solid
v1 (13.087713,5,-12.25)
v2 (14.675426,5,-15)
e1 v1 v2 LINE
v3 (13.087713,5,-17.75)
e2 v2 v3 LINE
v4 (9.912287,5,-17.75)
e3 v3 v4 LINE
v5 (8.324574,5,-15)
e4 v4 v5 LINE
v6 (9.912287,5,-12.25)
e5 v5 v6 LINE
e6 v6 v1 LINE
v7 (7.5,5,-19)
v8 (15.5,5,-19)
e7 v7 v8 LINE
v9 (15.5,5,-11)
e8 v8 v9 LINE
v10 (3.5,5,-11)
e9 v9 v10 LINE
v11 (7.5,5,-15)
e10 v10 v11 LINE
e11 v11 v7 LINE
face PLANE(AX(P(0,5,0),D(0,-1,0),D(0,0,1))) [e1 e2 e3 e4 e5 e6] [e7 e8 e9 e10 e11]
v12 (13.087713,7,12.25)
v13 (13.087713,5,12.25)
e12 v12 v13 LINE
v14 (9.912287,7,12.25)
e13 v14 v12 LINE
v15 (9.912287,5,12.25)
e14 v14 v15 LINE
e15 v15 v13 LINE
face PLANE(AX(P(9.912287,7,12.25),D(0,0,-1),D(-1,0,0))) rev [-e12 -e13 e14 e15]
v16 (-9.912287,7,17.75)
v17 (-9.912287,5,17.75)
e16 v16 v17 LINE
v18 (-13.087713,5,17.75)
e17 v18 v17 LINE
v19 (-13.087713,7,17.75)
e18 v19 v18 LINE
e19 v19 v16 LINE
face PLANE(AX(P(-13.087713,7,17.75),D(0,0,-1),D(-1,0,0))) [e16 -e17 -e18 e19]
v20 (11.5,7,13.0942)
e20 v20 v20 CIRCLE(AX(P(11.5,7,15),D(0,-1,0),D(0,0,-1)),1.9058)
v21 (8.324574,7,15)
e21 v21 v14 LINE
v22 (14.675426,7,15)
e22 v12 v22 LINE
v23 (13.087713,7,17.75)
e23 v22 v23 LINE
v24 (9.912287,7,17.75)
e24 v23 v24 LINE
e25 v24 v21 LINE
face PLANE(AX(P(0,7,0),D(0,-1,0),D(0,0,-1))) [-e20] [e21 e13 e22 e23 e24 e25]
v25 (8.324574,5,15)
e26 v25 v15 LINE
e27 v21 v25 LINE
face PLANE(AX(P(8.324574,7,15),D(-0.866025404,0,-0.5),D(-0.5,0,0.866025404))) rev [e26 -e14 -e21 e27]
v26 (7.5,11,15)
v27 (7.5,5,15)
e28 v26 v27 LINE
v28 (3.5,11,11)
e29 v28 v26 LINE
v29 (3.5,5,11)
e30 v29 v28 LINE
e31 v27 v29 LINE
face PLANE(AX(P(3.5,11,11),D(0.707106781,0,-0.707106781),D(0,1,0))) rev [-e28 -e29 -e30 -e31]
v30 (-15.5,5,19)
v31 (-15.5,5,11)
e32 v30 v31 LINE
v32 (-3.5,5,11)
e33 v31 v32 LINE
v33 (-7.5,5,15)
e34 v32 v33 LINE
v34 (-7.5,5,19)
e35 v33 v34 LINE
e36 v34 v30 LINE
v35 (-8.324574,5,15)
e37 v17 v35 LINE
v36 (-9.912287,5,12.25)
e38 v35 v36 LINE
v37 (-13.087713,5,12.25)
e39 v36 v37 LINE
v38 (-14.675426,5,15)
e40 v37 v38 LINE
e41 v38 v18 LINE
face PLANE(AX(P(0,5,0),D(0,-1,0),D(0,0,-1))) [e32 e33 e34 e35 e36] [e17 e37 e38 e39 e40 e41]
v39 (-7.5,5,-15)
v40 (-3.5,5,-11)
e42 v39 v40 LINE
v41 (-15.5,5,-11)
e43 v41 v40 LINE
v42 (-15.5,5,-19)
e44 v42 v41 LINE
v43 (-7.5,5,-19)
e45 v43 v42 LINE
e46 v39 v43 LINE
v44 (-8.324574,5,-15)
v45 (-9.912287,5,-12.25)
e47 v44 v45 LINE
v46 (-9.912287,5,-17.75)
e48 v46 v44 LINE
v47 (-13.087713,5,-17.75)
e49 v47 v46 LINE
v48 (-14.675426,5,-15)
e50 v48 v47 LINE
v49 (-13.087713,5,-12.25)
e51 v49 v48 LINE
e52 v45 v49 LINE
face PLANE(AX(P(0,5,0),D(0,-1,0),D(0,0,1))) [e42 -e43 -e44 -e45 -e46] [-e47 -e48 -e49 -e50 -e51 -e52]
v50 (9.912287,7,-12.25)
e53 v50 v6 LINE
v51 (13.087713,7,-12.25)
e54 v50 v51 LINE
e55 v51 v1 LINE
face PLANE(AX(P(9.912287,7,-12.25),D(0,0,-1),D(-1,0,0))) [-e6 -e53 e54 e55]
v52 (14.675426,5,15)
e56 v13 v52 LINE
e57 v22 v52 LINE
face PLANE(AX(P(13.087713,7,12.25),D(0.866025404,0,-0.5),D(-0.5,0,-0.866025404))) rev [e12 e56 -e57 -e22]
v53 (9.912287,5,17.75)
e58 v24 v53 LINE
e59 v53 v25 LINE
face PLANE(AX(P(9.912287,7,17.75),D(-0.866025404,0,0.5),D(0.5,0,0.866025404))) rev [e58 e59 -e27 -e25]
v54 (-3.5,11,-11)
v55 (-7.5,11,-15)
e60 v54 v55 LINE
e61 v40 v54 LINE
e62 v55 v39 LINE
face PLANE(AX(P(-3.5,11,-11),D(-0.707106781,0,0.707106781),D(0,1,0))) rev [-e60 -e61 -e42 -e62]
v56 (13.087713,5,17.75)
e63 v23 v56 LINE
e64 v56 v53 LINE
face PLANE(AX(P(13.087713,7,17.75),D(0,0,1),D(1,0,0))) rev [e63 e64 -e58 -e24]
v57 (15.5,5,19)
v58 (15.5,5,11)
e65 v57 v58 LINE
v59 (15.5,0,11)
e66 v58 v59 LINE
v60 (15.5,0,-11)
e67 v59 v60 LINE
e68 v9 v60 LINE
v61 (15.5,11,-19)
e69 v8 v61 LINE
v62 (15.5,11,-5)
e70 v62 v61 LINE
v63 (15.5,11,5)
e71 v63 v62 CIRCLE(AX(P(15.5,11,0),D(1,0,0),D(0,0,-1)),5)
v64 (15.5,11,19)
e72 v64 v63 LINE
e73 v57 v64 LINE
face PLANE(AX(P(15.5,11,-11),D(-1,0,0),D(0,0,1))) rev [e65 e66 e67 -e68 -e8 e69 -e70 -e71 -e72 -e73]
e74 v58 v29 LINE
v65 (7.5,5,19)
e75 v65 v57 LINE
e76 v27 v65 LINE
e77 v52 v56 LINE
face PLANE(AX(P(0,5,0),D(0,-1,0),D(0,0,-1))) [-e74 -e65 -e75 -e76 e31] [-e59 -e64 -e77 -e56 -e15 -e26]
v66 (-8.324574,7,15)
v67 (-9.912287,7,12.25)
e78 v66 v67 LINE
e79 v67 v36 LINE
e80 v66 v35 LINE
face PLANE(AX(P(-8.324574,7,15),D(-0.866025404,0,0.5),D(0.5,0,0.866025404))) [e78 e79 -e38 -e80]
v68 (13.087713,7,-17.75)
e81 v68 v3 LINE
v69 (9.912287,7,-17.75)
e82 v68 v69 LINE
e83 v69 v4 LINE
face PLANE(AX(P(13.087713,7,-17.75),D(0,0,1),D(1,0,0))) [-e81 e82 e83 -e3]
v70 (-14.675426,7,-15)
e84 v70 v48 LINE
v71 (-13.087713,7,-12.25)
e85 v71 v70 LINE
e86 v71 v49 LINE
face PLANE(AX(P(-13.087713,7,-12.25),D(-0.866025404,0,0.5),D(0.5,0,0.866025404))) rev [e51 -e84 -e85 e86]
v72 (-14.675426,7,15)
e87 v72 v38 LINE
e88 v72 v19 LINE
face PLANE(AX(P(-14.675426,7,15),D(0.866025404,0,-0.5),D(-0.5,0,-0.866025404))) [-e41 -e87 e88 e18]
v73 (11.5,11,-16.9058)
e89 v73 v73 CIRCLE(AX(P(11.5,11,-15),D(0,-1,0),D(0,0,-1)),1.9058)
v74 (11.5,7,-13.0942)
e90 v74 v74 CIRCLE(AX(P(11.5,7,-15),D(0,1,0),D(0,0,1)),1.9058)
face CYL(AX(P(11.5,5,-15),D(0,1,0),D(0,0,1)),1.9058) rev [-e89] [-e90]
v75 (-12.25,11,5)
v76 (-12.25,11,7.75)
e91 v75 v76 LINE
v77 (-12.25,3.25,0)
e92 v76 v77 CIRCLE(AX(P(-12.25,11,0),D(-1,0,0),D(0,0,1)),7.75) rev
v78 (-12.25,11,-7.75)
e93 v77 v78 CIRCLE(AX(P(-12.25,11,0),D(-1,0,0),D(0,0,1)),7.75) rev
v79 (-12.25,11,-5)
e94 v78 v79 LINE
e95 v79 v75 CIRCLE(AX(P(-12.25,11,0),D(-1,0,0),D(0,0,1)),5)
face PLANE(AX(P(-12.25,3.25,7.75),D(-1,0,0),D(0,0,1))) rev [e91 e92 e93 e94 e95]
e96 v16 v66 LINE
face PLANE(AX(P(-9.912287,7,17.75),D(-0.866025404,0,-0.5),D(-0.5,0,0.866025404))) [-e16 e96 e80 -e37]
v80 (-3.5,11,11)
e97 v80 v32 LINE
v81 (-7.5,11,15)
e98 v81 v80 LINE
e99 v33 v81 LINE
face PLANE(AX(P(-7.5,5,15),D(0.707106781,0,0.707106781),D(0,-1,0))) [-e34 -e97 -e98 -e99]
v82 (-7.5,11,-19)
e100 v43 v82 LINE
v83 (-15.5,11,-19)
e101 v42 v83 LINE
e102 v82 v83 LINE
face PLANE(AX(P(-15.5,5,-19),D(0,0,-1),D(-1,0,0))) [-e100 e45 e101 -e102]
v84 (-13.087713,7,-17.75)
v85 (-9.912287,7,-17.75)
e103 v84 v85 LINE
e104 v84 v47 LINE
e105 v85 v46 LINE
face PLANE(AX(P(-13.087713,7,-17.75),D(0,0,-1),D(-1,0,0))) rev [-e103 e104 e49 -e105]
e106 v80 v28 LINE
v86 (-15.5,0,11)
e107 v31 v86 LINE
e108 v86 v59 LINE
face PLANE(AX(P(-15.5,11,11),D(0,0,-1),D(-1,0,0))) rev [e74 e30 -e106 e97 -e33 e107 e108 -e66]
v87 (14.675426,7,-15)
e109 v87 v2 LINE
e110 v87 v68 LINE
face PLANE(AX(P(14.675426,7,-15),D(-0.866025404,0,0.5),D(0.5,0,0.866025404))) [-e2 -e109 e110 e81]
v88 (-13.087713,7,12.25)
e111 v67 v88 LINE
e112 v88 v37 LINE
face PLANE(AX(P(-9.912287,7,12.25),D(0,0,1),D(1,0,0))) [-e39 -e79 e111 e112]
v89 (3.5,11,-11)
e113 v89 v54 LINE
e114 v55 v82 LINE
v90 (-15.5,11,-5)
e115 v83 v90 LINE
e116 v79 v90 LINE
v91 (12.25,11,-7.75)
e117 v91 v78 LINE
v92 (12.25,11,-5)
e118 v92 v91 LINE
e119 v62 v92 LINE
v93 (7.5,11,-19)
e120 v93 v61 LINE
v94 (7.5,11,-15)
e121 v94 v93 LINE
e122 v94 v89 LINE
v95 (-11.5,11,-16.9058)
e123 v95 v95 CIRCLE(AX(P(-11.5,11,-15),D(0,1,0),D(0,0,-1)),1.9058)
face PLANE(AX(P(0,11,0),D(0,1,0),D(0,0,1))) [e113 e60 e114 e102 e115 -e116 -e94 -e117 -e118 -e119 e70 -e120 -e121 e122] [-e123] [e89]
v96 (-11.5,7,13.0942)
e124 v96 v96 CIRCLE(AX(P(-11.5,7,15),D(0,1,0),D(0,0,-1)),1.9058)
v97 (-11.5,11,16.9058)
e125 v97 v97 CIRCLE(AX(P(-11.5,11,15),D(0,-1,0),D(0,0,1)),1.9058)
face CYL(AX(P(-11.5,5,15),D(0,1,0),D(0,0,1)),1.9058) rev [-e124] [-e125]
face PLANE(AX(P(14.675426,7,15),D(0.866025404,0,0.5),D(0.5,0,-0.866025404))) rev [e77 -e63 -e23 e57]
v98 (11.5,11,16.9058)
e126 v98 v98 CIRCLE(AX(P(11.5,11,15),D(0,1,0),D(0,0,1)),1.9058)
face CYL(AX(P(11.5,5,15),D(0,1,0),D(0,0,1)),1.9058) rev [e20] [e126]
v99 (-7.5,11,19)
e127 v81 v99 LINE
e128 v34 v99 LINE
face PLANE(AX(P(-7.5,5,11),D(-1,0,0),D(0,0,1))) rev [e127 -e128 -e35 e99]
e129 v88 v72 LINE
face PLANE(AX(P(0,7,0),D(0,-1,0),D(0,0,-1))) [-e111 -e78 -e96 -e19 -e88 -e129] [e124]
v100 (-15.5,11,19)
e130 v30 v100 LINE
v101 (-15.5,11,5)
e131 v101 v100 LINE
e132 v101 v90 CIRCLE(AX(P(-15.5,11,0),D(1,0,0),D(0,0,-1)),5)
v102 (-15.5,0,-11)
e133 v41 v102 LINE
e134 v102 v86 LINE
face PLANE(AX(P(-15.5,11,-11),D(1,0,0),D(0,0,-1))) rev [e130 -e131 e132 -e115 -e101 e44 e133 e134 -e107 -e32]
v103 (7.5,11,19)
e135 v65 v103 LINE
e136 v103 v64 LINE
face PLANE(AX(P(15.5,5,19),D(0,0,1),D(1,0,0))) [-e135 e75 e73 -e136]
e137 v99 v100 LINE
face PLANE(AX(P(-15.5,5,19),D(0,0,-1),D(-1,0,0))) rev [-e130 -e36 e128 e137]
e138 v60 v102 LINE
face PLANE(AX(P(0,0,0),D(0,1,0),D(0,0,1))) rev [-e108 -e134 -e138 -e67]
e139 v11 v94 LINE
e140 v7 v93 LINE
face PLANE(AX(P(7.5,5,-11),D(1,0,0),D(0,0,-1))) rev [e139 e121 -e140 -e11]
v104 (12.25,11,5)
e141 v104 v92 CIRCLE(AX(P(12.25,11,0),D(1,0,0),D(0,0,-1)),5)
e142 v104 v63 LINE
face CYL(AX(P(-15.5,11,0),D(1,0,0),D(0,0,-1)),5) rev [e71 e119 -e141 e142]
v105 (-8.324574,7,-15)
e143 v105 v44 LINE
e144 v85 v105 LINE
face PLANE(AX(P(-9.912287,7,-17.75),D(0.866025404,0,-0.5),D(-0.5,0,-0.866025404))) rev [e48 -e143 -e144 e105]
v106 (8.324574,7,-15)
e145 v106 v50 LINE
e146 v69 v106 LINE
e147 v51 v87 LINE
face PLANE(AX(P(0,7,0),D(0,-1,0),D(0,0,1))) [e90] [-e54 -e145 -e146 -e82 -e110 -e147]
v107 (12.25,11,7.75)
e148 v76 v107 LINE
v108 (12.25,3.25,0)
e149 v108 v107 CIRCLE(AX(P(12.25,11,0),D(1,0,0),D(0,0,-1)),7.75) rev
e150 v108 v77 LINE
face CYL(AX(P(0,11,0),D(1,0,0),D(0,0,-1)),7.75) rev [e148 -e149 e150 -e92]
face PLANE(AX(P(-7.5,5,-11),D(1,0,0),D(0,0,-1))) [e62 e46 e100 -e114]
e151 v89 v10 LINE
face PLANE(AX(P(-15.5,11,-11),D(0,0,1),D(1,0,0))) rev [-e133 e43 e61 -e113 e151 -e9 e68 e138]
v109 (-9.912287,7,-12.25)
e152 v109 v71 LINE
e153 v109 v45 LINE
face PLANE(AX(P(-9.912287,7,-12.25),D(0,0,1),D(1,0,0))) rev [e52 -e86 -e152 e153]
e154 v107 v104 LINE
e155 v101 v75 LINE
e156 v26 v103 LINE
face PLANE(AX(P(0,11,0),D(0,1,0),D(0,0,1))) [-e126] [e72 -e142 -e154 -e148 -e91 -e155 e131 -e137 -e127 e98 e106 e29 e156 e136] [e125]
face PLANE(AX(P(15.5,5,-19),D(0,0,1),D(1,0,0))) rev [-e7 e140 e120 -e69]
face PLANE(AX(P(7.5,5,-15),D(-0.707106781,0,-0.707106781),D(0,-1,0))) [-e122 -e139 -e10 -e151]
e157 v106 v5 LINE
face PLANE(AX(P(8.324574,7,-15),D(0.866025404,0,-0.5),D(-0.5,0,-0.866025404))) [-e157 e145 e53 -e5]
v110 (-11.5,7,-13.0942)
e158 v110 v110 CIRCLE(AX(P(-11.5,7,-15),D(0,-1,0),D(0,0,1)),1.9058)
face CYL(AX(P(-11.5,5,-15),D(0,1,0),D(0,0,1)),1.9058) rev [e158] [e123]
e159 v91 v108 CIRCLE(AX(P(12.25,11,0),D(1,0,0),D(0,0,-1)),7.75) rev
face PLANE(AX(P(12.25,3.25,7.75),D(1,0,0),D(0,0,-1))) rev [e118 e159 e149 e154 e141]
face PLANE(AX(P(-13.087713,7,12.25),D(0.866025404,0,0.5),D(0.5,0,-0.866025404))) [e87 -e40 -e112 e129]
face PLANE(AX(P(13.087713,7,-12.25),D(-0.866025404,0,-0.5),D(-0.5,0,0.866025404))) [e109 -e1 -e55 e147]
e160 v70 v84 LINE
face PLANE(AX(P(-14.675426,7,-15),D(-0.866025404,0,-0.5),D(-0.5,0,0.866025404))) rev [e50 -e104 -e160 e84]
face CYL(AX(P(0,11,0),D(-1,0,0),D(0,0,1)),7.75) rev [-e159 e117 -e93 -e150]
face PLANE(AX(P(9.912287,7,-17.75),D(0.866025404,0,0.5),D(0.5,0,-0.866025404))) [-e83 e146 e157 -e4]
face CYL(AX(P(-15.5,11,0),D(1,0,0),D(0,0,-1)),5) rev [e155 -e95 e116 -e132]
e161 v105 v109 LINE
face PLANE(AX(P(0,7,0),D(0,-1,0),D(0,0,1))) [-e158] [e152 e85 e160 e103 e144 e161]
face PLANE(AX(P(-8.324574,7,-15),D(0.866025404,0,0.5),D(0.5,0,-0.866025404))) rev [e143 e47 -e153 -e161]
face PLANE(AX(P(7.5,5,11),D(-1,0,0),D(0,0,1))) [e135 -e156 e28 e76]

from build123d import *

# Parameters (mm, degrees)
SKETCH1_W                = 31
SKETCH1_H                = 22
BOSS_EXTRUDE1_DEPTH      = 11
SKETCH3_W                = 24.5
SKETCH3_H                = 15.5
CUT_EXTRUDE1_DEPTH       = 7.75
FILLET1_R                = 7.75
CUT_EXTRUDE2_DEPTH       = 32.812929761
CUT_EXTRUDE2_DEPTH_BACK  = 32.812929761
SKETCH4_R                = 5
SKETCH5_W                = 8
SKETCH5_H                = 8
SKETCH5_R                = 1.905800151
BOSS_EXTRUDE3_DEPTH      = 6
MIRROR9_COPY_1_SKETCH_W  = 8
MIRROR9_COPY_1_SKETCH_H  = 8
MIRROR9_COPY_1_SKETCH_R  = 1.905800151
MIRROR9_COPY_1_DEPTH     = 6
CUT_EXTRUDE4_START       = -2
SKETCH7_R                = 1.905800151
CUT_EXTRUDE4_DEPTH       = 2
MIRROR11_START           = -2
MIRROR11_COPY_1_SKETCH_R = 1.905800151
MIRROR11_COPY_1_DEPTH    = 2
CHAMFER3_SIZE            = 4


with BuildPart() as part:
    # Sketch1 → Boss-Extrude1 (new body)
    with BuildSketch(Plane(origin=(0, 0, 0), x_dir=(1, 0, 0), z_dir=(0, 1, 0))):
        Rectangle(SKETCH1_W, SKETCH1_H)
    extrude(amount=BOSS_EXTRUDE1_DEPTH)

    # Sketch3 → Cut-Extrude1 (cut)
    with BuildSketch(Plane(origin=(0, 11, 0), x_dir=(1, 0, 0), z_dir=(0, 1, 0))):
        Rectangle(SKETCH3_W, SKETCH3_H)
    extrude(amount=-CUT_EXTRUDE1_DEPTH, mode=Mode.SUBTRACT)

    # Fillet1
    fillet1_edges = [part.edges().sort_by_distance(p)[0] for p in [
        (0, 3.25, 7.75),
        (0, 3.25, -7.75),
    ]]
    fillet(fillet1_edges, radius=FILLET1_R - 0.0001)  # a hair under: the kernel refuses the full size

    # Sketch4 → Cut-Extrude2 (cut, two sides: drawn at the far end of the back side and taken through both)
    with BuildSketch(Plane(origin=(-12.25, 0, 0), x_dir=(0, 0, -1), z_dir=(1, 0, 0)).offset(-CUT_EXTRUDE2_DEPTH_BACK)):
        with Locations((0, 11)):
            Circle(SKETCH4_R)
    extrude(amount=CUT_EXTRUDE2_DEPTH + CUT_EXTRUDE2_DEPTH_BACK, mode=Mode.SUBTRACT)

    # Sketch5 → Boss-Extrude3 (add)
    with BuildSketch(Plane(origin=(0, 11, 0), x_dir=(1, 0, 0), z_dir=(0, 1, 0))):
        with Locations((11.5, -15)):
            Rectangle(SKETCH5_W, SKETCH5_H)
        with Locations(Location((11.5, -15, 0), (0, 0, 270))):
            Circle(SKETCH5_R, mode=Mode.SUBTRACT)
    boss_extrude3 = extrude(amount=-BOSS_EXTRUDE3_DEPTH)

    # Mirror8: Boss-Extrude3 across plane
    add(boss_extrude3.mirror(Plane(origin=(0, 0, 0), x_dir=(0, 0, 1), z_dir=(1, 0, 0))))

    # Mirror9: Boss-Extrude3 across plane
    add(boss_extrude3.mirror(Plane.XY))

    # Mirror9 copy 1 sketch → Mirror9 copy 1 (add)
    with BuildSketch(Plane(origin=(0, 11, 0), x_dir=(-1, 0, 0), z_dir=(0, 1, 0))):
        with Locations((11.5, -15)):
            Rectangle(MIRROR9_COPY_1_SKETCH_W, MIRROR9_COPY_1_SKETCH_H)
        with Locations(Location((11.5, -15, 0), (0, 0, 270))):
            Circle(MIRROR9_COPY_1_SKETCH_R, mode=Mode.SUBTRACT)
    extrude(amount=-MIRROR9_COPY_1_DEPTH)

    # Sketch7 → Cut-Extrude4 (cut)
    with BuildSketch(Plane.XZ.offset(-5).offset(CUT_EXTRUDE4_START)):
        Polygon((14.675426481, 15), (13.08771324, 17.75), (9.91228676, 17.75), (8.324573519, 15), (9.91228676, 12.25), (13.08771324, 12.25), align=None)
        with Locations(Location((11.5, 15, 0), (0, 0, 90))):
            Circle(SKETCH7_R, mode=Mode.SUBTRACT)
    cut_extrude4 = extrude(amount=CUT_EXTRUDE4_DEPTH, mode=Mode.SUBTRACT)

    # Mirror10: Cut-Extrude4 across plane
    add(cut_extrude4.mirror(Plane(origin=(0, 0, 0), x_dir=(0, 0, 1), z_dir=(1, 0, 0))), mode=Mode.SUBTRACT)

    # Mirror11: Cut-Extrude4 across plane
    add(cut_extrude4.mirror(Plane.XY), mode=Mode.SUBTRACT)

    # Mirror11 copy 1 sketch → Mirror11 copy 1 (cut)
    with BuildSketch(Plane(origin=(0, 5, 0), x_dir=(-1, 0, 0), z_dir=(0, -1, 0)).offset(MIRROR11_START)):
        Polygon((14.675426481, 15), (13.08771324, 17.75), (9.91228676, 17.75), (8.324573519, 15), (9.91228676, 12.25), (13.08771324, 12.25), align=None)
        with Locations(Location((11.5, 15, 0), (0, 0, 90))):
            Circle(MIRROR11_COPY_1_SKETCH_R, mode=Mode.SUBTRACT)
    extrude(amount=MIRROR11_COPY_1_DEPTH, mode=Mode.SUBTRACT)

    # Chamfer3
    chamfer3_edges = [part.edges().sort_by_distance(p)[0] for p in [
        (7.5, 8, 11),
        (-7.5, 8, 11),
        (-7.5, 8, -11),
        (7.5, 8, -11),
    ]]
    chamfer(chamfer3_edges, length=CHAMFER3_SIZE)


solid = part.part
